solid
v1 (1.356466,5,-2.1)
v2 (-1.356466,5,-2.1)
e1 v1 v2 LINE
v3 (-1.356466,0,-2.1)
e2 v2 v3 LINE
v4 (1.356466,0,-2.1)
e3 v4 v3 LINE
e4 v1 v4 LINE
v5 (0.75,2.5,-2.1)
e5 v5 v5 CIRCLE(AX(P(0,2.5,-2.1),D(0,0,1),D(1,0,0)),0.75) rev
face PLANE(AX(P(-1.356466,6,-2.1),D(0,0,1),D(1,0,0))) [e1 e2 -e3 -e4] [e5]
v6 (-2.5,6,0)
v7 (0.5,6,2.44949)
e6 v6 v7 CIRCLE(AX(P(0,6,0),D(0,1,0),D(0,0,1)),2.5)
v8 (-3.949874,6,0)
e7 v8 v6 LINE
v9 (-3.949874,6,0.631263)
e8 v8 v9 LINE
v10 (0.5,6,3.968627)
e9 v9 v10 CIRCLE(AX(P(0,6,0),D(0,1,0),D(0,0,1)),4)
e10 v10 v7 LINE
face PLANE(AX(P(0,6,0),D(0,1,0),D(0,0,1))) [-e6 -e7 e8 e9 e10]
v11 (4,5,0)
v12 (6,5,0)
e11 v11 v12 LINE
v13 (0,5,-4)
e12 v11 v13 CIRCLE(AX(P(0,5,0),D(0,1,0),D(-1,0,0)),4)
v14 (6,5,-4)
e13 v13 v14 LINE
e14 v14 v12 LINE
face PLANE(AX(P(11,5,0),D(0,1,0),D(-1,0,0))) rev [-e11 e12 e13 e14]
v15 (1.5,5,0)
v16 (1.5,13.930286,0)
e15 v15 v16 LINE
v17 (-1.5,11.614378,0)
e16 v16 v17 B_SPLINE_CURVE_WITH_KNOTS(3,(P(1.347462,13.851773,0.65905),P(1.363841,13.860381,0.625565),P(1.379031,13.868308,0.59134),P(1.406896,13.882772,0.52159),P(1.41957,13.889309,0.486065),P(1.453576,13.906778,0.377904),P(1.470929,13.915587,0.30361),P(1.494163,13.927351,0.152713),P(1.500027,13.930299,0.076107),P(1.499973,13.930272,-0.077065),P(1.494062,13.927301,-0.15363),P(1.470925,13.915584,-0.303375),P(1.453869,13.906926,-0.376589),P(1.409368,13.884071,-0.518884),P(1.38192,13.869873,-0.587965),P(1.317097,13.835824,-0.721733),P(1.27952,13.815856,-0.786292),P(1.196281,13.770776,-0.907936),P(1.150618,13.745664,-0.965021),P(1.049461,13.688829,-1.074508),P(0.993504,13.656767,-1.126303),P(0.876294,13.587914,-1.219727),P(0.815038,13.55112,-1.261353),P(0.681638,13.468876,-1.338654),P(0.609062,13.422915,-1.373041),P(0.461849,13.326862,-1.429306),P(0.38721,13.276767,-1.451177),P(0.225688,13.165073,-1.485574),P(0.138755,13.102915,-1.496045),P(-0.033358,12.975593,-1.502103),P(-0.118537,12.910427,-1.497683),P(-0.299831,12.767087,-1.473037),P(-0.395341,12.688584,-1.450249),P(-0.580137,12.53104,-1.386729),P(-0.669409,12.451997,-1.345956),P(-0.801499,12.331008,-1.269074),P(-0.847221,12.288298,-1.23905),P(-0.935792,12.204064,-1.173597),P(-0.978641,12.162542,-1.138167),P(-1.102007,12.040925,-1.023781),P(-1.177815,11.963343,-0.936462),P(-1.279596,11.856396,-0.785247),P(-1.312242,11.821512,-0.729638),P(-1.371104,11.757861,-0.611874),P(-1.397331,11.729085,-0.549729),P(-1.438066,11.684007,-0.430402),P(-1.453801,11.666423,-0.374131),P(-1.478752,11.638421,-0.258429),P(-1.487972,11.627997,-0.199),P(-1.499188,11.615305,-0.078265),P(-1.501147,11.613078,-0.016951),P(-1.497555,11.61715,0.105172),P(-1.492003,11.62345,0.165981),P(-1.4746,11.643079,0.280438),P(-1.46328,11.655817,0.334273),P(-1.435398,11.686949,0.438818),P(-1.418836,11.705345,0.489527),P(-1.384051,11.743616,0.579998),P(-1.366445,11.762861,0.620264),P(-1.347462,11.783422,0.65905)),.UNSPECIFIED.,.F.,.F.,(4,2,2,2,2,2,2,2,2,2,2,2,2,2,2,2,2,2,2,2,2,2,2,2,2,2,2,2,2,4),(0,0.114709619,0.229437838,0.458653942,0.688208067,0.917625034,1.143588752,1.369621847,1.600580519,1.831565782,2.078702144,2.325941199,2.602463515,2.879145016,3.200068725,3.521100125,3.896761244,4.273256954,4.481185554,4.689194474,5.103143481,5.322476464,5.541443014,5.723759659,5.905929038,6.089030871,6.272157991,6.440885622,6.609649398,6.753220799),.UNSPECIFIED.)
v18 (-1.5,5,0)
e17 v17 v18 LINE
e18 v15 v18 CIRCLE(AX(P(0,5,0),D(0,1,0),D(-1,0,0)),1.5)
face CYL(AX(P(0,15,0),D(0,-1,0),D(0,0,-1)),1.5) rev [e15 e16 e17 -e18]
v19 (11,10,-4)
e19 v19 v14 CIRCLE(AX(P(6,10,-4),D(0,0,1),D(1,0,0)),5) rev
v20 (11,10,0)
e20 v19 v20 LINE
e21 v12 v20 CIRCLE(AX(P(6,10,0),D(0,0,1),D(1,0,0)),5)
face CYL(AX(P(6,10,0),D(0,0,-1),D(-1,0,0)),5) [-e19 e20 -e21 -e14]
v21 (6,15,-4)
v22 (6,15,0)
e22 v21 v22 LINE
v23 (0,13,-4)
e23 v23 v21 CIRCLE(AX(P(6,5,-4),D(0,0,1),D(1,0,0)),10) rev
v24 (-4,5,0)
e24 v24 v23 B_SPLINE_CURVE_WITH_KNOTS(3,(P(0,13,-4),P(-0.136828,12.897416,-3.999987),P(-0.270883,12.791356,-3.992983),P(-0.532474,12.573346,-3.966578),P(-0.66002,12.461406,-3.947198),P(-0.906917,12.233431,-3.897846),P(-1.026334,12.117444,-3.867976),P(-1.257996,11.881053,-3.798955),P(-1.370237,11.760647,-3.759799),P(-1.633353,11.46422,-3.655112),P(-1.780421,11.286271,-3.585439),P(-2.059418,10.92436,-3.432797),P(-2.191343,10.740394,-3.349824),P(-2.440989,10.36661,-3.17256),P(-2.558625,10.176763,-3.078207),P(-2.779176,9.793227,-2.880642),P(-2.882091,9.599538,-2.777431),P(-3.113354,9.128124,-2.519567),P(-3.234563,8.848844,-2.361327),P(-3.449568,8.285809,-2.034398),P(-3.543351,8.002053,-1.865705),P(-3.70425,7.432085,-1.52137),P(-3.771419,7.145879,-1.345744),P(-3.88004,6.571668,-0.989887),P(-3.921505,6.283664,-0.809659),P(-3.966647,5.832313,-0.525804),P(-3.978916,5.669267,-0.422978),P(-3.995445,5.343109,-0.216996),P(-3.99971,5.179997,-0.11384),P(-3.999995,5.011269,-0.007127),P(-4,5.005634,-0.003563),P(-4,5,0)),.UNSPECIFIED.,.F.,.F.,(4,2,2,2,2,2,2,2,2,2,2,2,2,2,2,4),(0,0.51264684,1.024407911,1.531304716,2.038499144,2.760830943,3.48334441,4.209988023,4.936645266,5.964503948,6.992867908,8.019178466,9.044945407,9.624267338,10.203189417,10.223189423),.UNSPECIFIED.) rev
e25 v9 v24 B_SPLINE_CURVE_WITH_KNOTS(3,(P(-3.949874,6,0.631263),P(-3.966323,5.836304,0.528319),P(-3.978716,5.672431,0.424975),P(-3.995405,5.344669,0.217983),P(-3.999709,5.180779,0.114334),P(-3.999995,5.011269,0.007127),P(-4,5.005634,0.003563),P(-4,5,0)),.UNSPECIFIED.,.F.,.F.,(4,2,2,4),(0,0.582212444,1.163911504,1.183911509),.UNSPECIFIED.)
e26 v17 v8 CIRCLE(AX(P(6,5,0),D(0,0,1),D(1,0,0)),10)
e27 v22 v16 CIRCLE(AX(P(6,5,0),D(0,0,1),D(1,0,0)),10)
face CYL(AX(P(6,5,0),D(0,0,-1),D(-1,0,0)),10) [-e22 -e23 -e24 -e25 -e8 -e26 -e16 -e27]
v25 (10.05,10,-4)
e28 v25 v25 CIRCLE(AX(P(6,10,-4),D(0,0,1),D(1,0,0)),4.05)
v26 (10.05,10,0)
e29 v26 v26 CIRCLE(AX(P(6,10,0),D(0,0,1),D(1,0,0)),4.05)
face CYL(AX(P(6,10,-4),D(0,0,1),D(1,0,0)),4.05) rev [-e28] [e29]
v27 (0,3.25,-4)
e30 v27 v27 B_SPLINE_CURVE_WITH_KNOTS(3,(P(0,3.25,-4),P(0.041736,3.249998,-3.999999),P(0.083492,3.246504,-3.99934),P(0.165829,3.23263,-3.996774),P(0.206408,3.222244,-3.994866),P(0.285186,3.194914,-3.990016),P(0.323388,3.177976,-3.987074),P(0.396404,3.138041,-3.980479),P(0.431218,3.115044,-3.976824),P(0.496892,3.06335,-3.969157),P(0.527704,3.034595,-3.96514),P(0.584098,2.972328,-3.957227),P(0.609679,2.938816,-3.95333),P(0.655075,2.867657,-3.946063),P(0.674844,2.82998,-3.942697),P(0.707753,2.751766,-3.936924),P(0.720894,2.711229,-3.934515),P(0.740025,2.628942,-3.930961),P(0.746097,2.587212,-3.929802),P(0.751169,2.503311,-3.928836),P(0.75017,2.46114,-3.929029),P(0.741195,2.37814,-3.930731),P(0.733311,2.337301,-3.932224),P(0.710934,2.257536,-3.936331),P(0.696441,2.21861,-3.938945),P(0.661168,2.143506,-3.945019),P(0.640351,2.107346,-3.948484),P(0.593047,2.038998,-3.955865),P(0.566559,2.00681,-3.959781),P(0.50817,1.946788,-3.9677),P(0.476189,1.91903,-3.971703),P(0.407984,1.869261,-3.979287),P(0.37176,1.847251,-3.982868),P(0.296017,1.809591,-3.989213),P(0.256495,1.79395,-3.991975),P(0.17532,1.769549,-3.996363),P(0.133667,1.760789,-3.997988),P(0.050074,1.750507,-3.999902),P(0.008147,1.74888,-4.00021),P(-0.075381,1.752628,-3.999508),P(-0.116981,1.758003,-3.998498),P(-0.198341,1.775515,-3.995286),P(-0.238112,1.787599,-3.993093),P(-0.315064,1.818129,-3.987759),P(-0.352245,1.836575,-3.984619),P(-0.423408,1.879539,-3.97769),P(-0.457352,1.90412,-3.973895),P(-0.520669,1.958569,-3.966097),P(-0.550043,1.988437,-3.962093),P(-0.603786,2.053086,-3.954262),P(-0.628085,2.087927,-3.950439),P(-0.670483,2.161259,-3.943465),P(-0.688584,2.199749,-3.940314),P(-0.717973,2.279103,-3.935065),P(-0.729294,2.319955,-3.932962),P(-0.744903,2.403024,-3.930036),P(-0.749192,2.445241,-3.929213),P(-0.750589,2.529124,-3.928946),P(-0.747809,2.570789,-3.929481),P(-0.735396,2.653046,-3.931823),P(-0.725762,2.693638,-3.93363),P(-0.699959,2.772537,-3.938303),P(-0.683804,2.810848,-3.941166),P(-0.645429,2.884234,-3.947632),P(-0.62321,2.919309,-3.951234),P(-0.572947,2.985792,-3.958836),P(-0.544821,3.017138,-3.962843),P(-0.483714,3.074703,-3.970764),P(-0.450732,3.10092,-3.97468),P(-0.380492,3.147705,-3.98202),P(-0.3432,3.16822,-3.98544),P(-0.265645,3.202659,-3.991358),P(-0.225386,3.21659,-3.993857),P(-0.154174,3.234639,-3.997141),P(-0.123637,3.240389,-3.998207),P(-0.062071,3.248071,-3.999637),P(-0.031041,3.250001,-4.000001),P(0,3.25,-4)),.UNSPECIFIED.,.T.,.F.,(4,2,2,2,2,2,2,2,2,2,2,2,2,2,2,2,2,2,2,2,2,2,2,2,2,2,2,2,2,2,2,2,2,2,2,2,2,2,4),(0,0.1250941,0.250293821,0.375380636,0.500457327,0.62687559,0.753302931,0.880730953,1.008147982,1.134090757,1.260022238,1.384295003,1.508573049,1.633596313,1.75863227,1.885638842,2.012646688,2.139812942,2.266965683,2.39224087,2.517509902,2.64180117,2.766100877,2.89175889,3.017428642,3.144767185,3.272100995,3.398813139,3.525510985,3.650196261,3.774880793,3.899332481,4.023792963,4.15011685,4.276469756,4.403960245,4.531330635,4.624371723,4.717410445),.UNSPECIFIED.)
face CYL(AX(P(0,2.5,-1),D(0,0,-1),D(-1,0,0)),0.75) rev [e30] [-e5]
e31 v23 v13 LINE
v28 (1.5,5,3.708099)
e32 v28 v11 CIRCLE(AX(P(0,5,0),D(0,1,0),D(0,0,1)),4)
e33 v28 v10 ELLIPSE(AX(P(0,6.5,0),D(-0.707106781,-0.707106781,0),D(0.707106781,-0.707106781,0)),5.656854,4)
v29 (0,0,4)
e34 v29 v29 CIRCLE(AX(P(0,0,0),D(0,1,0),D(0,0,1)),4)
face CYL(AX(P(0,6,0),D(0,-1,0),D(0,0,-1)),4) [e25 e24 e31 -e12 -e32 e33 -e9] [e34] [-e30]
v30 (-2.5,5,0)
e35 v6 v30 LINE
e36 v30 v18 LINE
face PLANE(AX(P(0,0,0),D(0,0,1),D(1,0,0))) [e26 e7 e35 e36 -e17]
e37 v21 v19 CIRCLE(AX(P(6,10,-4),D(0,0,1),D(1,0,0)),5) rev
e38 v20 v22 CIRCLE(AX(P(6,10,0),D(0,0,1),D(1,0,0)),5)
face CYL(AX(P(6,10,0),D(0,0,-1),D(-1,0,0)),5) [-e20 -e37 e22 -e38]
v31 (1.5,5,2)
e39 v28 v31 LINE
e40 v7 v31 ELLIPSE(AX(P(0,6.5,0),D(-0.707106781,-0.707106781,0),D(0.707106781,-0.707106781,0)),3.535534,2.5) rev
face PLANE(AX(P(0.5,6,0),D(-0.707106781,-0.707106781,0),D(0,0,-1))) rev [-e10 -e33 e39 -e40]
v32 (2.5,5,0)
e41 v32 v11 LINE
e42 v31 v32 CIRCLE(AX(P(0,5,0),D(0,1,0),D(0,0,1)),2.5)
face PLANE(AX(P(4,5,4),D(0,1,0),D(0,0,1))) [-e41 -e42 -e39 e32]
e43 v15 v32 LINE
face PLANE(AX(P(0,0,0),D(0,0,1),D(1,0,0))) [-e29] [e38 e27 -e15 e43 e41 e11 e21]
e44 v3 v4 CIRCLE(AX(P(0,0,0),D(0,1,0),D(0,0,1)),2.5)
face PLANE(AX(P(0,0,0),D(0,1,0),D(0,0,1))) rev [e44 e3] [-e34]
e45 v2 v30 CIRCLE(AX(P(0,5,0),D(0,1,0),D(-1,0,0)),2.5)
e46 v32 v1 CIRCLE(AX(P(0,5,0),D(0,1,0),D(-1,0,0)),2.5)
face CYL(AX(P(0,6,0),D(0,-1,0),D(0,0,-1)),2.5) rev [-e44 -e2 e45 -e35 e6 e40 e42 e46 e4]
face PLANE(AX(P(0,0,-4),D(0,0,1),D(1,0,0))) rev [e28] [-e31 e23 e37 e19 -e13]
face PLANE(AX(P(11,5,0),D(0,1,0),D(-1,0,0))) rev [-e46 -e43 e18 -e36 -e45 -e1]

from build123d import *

# Parameters (mm, degrees)
SKETCH_1_R          = 4
EXTRUDE_1_DEPTH     = 6
CUT_EXTRUDE_1_DEPTH = 9.246211251
SKETCH_4_W          = 15
SKETCH_4_H          = 10
EXTRUDE_2_DEPTH     = 4
SKETCH_5_R          = 4.05
CUT_EXTRUDE_3_DEPTH = 20.02629759
FILLET_1_R          = 10
FILLET_2_R          = 5
CUT_EXTRUDE_4_DEPTH = 16.394804409
SKETCH_7_R          = 1.5
CUT_EXTRUDE_5_DEPTH = 20.02629769
SKETCH_8_R          = 0.75
CUT_EXTRUDE_7_DEPTH = 3
SKETCH_9_W          = 2.5
SKETCH_9_H          = 1
CUT_EXTRUDE_8_DEPTH = 20.02629769
CHAMFER_1_SIZE      = 1


# Some blends are built 0.0001 mm under size
with BuildPart() as part:
    # 草图1 → 凸台-拉伸1 (new body)
    with BuildSketch(Plane(origin=(0, 0, 0), x_dir=(1, 0, 0), z_dir=(0, 1, 0))):
        with Locations(Location((0, 0, 0), (0, 0, 270))):
            Circle(SKETCH_1_R)
    extrude(amount=EXTRUDE_1_DEPTH)

    # 草图2 → 切除-拉伸1 (cut, through all)
    with BuildSketch(Plane(origin=(0, 0, 0), x_dir=(1, 0, 0), z_dir=(0, 1, 0))):
        with BuildLine():
            Line((-1.356465997, 2.1), (1.356465997, 2.1))
            ThreePointArc((1.356465997, 2.1), (0, -2.5), (-1.356465997, 2.1))
        make_face()
    extrude(amount=CUT_EXTRUDE_1_DEPTH, mode=Mode.SUBTRACT)

    # 草图4 → 凸台-拉伸2 (add)
    with BuildSketch(Plane.XY.offset(-4)):
        with Locations((3.5, 10)):
            Rectangle(SKETCH_4_W, SKETCH_4_H)
    extrude(amount=EXTRUDE_2_DEPTH)

    # 草图5 → 切除-拉伸3 (cut, through all)
    with BuildSketch(Plane.XY):
        with Locations((6, 10)):
            Circle(SKETCH_5_R)
    extrude(amount=-CUT_EXTRUDE_3_DEPTH, mode=Mode.SUBTRACT)

    # 圆角1
    # the kernel refuses this fillet: 10 mm, written as the material it takes off along each edge
    with BuildSketch(Plane(origin=(-4, 15, -29), x_dir=(0, -1, 0), z_dir=(0, 0, 1))) as fillet_1_piece_1:
        with BuildLine():
            CenterArc((FILLET_1_R, FILLET_1_R), FILLET_1_R, 180, 90)
            Line((0, FILLET_1_R), (0, 0))
            Line((0, 0), (FILLET_1_R, 0))
        make_face()
    extrude(amount=54, mode=Mode.SUBTRACT)

    # 圆角2
    fillet_2_edges = [part.edges().sort_by_distance(p)[0] for p in [
        (11, 5, -2),
        (11, 15, -2),
    ]]
    fillet(fillet_2_edges, radius=FILLET_2_R - 0.0001)  # a hair under: the kernel refuses the full size

    # 草图6 → 切除-拉伸4 (cut, through all)
    with BuildSketch(Plane.XZ.offset(-5)):
        with BuildLine():
            Line((-4, -4), (-4, 0))
            ThreePointArc((-4, 0), (-2.828427125, -2.828427125), (0, -4))
            Line((0, -4), (-4, -4))
        make_face()
    extrude(amount=-CUT_EXTRUDE_4_DEPTH, mode=Mode.SUBTRACT)

    # 草图7 → 切除-拉伸5 (cut, through all)
    with BuildSketch(Plane.XZ):
        Circle(SKETCH_7_R)
    extrude(amount=-CUT_EXTRUDE_5_DEPTH, mode=Mode.SUBTRACT)

    # 草图8 → 切除-拉伸7 (cut)
    with BuildSketch(Plane.XY.offset(-4)):
        with Locations(Location((0, 2.5, 0), (0, 0, 270))):
            Circle(SKETCH_8_R)
    extrude(amount=CUT_EXTRUDE_7_DEPTH, mode=Mode.SUBTRACT)

    # 草图9 → 切除-拉伸8 (cut, through all)
    with BuildSketch(Plane.XY):
        with Locations((2.75, 5.5)):
            Rectangle(SKETCH_9_W, SKETCH_9_H)
    extrude(amount=CUT_EXTRUDE_8_DEPTH, mode=Mode.SUBTRACT)

    # 倒角1
    chamfer_1_edges = [part.edges().sort_by_distance(p)[0] for p in [
        (1.5, 6, 2.854049622),
    ]]
    chamfer(chamfer_1_edges, length=CHAMFER_1_SIZE - 0.0001)  # a hair under: the kernel refuses the full size


solid = part.part
